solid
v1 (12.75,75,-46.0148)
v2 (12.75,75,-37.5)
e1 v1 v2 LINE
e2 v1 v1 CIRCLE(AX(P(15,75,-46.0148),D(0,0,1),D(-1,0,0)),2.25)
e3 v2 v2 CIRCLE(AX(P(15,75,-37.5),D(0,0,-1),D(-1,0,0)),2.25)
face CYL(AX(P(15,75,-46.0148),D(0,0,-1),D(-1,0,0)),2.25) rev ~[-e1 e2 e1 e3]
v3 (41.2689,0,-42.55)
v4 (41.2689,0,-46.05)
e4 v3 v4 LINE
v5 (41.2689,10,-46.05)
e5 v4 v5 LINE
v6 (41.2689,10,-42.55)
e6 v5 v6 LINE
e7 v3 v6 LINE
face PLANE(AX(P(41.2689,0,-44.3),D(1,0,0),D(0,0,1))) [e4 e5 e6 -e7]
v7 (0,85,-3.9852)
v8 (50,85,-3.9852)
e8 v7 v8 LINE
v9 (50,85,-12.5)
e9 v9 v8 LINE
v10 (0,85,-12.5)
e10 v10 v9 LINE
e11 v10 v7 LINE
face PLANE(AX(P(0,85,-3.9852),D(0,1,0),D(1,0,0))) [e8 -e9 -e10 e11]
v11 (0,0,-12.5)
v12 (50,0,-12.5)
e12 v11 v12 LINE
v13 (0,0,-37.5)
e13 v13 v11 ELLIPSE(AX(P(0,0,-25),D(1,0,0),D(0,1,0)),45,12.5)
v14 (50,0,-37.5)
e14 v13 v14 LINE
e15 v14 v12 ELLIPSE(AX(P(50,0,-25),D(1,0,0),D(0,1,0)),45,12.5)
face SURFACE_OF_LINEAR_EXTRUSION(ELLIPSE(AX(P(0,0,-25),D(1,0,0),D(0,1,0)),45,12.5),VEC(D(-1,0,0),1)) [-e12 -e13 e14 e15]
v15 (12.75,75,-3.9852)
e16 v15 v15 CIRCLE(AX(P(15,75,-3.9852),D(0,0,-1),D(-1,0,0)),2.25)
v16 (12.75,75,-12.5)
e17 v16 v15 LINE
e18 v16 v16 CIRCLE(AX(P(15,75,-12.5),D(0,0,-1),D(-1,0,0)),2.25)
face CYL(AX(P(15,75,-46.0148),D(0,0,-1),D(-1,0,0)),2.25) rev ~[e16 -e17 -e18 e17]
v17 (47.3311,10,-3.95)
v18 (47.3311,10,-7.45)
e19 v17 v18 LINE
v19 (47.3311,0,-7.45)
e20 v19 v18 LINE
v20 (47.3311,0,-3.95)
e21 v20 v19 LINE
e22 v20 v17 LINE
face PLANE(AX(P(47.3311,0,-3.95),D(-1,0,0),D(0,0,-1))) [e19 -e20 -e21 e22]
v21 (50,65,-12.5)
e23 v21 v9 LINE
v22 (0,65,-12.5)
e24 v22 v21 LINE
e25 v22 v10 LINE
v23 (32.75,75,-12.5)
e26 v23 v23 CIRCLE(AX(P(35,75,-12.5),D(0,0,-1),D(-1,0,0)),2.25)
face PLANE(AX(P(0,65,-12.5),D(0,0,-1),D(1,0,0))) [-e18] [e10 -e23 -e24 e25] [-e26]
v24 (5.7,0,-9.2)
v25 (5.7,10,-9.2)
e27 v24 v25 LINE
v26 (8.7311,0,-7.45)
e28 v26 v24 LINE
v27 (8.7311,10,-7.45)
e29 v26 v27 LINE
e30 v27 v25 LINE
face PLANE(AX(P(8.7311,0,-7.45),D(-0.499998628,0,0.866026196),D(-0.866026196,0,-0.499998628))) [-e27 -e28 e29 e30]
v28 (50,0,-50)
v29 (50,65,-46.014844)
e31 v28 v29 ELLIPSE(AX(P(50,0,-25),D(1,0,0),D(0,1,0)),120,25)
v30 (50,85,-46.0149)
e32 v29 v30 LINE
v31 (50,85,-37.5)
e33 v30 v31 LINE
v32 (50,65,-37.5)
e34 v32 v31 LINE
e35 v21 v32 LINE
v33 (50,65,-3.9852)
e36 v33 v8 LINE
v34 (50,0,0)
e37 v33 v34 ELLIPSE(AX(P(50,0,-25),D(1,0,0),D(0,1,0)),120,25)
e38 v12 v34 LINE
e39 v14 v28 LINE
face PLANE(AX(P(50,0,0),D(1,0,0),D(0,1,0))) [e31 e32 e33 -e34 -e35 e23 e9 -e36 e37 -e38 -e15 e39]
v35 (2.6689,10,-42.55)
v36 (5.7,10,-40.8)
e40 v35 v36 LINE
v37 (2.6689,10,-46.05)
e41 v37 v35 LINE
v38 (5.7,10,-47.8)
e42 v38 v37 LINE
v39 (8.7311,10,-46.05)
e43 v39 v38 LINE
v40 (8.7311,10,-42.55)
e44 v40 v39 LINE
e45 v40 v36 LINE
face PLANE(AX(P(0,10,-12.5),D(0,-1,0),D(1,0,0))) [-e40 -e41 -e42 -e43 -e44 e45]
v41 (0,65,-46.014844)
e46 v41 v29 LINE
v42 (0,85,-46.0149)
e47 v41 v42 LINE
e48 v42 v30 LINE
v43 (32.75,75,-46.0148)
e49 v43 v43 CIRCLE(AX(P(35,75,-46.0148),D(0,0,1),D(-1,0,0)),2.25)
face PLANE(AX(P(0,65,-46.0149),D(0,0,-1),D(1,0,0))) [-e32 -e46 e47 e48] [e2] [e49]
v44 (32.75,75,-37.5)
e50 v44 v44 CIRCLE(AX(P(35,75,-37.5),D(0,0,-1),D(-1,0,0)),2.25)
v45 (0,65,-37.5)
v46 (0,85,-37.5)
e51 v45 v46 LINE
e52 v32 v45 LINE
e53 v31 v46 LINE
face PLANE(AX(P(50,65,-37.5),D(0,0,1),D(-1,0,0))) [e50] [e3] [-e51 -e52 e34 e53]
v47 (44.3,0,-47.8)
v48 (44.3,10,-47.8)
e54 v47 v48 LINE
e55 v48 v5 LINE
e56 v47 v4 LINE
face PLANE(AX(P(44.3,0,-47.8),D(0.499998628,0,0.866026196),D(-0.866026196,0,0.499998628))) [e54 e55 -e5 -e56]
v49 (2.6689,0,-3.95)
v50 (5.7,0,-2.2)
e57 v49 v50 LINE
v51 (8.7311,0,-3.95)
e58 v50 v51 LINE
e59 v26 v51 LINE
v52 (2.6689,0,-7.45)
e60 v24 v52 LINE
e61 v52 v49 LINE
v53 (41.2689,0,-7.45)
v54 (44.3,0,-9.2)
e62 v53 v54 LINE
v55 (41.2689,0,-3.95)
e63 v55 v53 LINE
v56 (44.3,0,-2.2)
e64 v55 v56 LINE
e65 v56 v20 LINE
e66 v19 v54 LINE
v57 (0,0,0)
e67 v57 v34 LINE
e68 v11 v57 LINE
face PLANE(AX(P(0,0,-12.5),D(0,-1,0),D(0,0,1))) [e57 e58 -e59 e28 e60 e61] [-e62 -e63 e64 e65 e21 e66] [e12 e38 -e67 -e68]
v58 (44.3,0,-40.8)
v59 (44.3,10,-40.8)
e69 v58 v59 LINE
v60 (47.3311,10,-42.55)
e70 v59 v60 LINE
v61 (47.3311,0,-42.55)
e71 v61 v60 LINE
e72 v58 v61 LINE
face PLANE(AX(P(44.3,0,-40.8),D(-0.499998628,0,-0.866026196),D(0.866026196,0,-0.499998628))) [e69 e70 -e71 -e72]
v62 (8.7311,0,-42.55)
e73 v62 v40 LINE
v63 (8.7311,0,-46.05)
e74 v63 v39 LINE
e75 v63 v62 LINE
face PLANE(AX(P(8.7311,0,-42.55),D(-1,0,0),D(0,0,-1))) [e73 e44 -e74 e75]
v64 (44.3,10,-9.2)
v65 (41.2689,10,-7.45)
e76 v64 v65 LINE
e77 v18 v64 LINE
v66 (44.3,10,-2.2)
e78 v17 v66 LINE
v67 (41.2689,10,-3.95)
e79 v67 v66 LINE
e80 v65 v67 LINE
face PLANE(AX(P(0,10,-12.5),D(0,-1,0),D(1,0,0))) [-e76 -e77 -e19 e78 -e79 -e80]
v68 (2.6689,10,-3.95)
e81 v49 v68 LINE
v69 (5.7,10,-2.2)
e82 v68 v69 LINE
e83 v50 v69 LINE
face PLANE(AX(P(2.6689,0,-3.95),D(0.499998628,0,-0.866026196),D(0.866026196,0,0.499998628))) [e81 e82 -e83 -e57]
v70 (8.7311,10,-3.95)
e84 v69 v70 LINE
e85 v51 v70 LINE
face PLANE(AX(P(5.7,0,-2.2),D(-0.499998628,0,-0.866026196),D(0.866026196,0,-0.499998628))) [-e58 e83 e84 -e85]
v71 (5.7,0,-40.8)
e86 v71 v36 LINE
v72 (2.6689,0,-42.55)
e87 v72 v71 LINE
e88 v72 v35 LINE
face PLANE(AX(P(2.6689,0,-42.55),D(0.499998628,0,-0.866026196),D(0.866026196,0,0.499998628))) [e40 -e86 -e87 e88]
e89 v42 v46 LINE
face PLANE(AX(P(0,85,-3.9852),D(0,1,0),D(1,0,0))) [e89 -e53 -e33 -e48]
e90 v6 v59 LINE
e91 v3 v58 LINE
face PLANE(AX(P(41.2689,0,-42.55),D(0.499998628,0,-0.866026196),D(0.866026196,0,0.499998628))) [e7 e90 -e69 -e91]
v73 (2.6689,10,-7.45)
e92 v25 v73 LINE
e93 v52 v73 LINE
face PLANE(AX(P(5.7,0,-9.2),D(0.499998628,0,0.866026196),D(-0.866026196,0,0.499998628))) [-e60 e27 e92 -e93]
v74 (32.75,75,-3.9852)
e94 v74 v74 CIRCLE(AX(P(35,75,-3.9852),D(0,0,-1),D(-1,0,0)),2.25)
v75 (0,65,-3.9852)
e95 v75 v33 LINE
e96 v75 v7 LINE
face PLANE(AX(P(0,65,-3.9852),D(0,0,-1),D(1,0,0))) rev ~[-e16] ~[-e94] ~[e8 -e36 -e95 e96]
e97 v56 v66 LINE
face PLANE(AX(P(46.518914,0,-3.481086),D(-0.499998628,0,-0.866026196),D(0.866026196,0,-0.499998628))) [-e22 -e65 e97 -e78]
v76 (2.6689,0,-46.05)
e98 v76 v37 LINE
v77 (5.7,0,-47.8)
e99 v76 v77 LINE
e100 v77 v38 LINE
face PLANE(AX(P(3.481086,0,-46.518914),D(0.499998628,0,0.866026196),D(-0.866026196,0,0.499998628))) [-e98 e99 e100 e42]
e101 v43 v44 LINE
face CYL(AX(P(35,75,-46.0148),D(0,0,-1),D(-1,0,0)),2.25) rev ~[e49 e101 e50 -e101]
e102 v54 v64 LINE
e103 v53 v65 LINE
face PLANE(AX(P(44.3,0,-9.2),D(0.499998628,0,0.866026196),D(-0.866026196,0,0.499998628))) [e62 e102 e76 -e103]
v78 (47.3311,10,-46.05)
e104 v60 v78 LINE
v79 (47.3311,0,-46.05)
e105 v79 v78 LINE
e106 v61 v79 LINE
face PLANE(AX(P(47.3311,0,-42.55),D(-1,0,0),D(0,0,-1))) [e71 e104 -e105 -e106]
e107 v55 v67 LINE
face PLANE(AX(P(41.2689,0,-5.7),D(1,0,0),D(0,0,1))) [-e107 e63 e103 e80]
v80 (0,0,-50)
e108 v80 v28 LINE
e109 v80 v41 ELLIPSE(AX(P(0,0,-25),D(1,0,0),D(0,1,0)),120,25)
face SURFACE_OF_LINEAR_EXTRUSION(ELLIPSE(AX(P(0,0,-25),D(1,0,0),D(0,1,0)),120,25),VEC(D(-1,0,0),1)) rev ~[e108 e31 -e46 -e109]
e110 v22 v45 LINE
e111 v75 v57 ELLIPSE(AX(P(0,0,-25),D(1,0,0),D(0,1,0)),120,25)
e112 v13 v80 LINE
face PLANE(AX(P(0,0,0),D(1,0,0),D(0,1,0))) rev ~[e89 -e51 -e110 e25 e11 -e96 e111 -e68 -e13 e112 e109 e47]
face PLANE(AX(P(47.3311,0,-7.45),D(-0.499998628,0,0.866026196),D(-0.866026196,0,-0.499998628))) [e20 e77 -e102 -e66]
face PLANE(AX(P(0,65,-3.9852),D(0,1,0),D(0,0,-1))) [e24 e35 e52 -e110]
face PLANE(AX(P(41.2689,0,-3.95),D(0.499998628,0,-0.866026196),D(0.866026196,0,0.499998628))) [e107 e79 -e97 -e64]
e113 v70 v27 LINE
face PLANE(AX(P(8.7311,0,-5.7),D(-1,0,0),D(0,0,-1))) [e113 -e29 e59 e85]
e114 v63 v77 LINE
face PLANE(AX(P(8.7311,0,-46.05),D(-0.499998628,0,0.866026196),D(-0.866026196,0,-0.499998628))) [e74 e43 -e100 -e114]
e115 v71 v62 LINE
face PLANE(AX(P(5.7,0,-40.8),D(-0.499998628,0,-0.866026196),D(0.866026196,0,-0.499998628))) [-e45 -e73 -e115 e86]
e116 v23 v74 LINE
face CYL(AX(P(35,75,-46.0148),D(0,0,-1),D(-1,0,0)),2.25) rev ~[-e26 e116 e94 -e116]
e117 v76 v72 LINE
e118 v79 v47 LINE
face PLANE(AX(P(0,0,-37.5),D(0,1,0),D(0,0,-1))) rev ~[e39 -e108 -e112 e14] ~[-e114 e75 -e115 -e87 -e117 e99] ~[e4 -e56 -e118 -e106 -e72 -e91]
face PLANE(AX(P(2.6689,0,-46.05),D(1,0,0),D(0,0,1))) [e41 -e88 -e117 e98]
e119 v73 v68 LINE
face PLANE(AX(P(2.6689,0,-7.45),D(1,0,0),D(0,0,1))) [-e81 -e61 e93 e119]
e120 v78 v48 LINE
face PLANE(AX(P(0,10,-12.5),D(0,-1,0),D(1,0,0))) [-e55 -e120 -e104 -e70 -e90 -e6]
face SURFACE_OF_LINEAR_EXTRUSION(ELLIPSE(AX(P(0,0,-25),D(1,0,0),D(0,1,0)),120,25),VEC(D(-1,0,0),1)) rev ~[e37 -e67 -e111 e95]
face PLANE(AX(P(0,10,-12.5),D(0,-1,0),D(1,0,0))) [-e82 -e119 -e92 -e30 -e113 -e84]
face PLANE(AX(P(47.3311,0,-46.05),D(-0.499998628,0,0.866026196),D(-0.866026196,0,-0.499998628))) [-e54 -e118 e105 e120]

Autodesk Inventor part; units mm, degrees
ref_plane "YZ Plane" through (0, 0, 0) normal (1, 0, 0) x (0, 1, 0)
ref_plane "XZ Plane" through (0, 0, 0) normal (0, 1, 0) x (-1, 0, 0)
ref_plane "XY Plane" through (0, 0, 0) normal (0, 0, 1) x (1, 0, 0)
sketch "Sketch1" plane through (0, 0, 0) normal (1, 0, 0) x (0, 1, 0)
  ellipse E0 centre (0, -25) end of major axis (45, -25) minor radius 12.5 (0, -37.5) -> (0, -12.5) ccw
  ellipse E1 centre (0, -25) end of major axis (120, -25) minor radius 25 (0, -50) -> (0, 0) ccw
  line L0 (65, -3.9852) -> (65, -46.0148)
  line L1 (0, -37.5) -> (0, -50)
  line L2 (0, -12.5) -> (0, 0)
  point P0 (0, -43.75)
  point P1 (0, -6.25)
  dimension "d23" = 45
  dimension "d25" = 120
  dimension "d18" = 50
  dimension "d22" = 25
  dimension "d24" = 65
extrude "Extrusion1" add sketch "Sketch1" along normal blind 50 contours E0 L2 E1 L0 L1
sketch "Sketch3" plane through (0, 65, -3.9852) normal (0, 1, 0) x (1, 0, 0)
  line L0 (0, 42.0297) -> (0, 0) projected
  line L1 (0, 0) -> (50, 0) projected
  line L2 (50, 42.0297) -> (50, 0) projected
  line L3 (0, 42.0297) -> (50, 42.0297) projected
  line L4 (0, 33.5148) -> (0, 8.5148) projected
  line L5 (50, 0) -> (0, 0)
  line L6 (0, 0) -> (0, 8.5148)
  line L7 (0, 8.5148) -> (50, 8.5148)
  line L8 (50, 8.5148) -> (50, 0)
  line L9 (0, 42.0297) -> (50, 42.0297)
  line L10 (50, 42.0297) -> (50, 33.5148)
  line L11 (50, 33.5148) -> (0, 33.5148)
  line L12 (0, 33.5148) -> (0, 42.0297)
  point P0 (0, -3.9852)
  point P1 (0, 33.5148)
  dimension "d26" = 25
  dimension "d27" = 8.5148
  dimension "d28" = 8.5148
extrude "Extrusion3" add sketch "Sketch3" along normal blind 20 contours L3 L2 L11 L0 | L7 L2 L1 L0
sketch "Sketch4" plane through (50, 65, -46.0148) normal (0, 0, -1) x (-1, 0, 0)
  line L0 (50, 0) -> (0, 0) projected
  line L1 (50, 0) -> (50, 20) projected
  line L2 (0, 20) -> (50, 20) projected
  line L3 (0, 0) -> (0, 20) projected
  line L4 (0, 0) -> (0, 20) projected
  line L5 (0, 10) -> (50, 10)
  circle A0 centre (15, 10) radius 2.25
  circle A1 centre (35, 10) radius 2.25
  point P0 (50, -65)
  dimension "d31" = 4.5
  dimension "d32" = 4.5
  dimension "d33" = 20
  dimension "d34" = 15
  dimension "d35" = 15
extrude "Extrusion4" cut sketch "Sketch4" against normal through all contours A1 L5 | L5 A1 | A0 L5 | L5 A0
sketch "Sketch5" plane through (0, 0, -12.5) normal (0, -1, 0) x (1, 0, 0)
  line L0 (0, 12.5) -> (0, 0) projected
  line L1 (0, 0) -> (50, 0) projected
  line L2 (50, 12.5) -> (50, 0) projected
  line L3 (0, 12.5) -> (50, 12.5) projected
  line L4 (0, -25) -> (0, -37.5) projected
  line L5 (0, -37.5) -> (50, -37.5) projected
  line L6 (50, -25) -> (50, -37.5) projected
  line L7 (0, -25) -> (50, -25) projected
  line L8 (50, 8.5148) -> (50, 12.5) projected
  line L9 (0, -25) -> (0, -37.5) projected
  line L10 (50, 12.5) -> (0, -37.5)
  line L11 (5.7, 6.8) -> (44.3, 6.8)
  line L12 (44.3, 6.8) -> (44.3, -31.8)
  line L13 (44.3, -31.8) -> (5.7, -31.8)
  line L14 (5.7, -31.8) -> (5.7, 6.8)
  line L15 (5.7, 6.8) -> (44.3, -31.8) construction
  line L16 (44.3, 6.8) -> (5.7, -31.8) construction
  line L17 (44.3, 3.3) -> (41.2689, 5.05)
  line L18 (41.2689, 5.05) -> (41.2689, 8.55)
  line L19 (41.2689, 8.55) -> (44.3, 10.3)
  line L20 (44.3, 10.3) -> (47.3311, 8.55)
  line L21 (47.3311, 8.55) -> (47.3311, 5.05)
  line L22 (47.3311, 5.05) -> (44.3, 3.3)
  line L23 (41.2689, -33.55) -> (41.2689, -30.05)
  line L24 (41.2689, -30.05) -> (44.3, -28.3)
  line L25 (44.3, -28.3) -> (47.3311, -30.05)
  line L26 (47.3311, -30.05) -> (47.3311, -33.55)
  line L27 (47.3311, -33.55) -> (44.3, -35.3)
  line L28 (44.3, -35.3) -> (41.2689, -33.55)
  line L29 (8.7311, -30.05) -> (8.7311, -33.55)
  line L30 (8.7311, -33.55) -> (5.7, -35.3)
  line L31 (5.7, -35.3) -> (2.6689, -33.55)
  line L32 (2.6689, -33.55) -> (2.6689, -30.05)
  line L33 (2.6689, -30.05) -> (5.7, -28.3)
  line L34 (5.7, -28.3) -> (8.7311, -30.05)
  line L35 (8.7311, 8.55) -> (8.7311, 5.05)
  line L36 (8.7311, 5.05) -> (5.7, 3.3)
  line L37 (5.7, 3.3) -> (2.6689, 5.05)
  line L38 (2.6689, 5.05) -> (2.6689, 8.55)
  line L39 (2.6689, 8.55) -> (5.7, 10.3)
  line L40 (5.7, 10.3) -> (8.7311, 8.55)
  point P0 (25, -12.5)
  dimension "d38" = 38.6
  dimension "d39" = 38.6
  dimension "d40" = 7
  dimension "d41" = 7
  dimension "d42" = 7
  dimension "d43" = 7
extrude "Extrusion5" cut sketch "Sketch5" against normal blind 10 contours L20 L21 L22 L12 L10 | L10 L11 L18 L19 L20 | L37 L38 L39 L40 L35 L11 L14 | L14 L11 L35 L36 | L12 L17 L10 | L10 L17 L18 L11 | L34 L10 L14 | L14 L10 L31 L32 L33 | L34 L29 L13 L10 | L13 L29 L30 L31 L10 | L25 L26 L27 L28 L23 L13 L12 | L12 L13 L23 L24
equation "\"d27\" = d28"
properties part number "Arch" material "ABS Plastic"
